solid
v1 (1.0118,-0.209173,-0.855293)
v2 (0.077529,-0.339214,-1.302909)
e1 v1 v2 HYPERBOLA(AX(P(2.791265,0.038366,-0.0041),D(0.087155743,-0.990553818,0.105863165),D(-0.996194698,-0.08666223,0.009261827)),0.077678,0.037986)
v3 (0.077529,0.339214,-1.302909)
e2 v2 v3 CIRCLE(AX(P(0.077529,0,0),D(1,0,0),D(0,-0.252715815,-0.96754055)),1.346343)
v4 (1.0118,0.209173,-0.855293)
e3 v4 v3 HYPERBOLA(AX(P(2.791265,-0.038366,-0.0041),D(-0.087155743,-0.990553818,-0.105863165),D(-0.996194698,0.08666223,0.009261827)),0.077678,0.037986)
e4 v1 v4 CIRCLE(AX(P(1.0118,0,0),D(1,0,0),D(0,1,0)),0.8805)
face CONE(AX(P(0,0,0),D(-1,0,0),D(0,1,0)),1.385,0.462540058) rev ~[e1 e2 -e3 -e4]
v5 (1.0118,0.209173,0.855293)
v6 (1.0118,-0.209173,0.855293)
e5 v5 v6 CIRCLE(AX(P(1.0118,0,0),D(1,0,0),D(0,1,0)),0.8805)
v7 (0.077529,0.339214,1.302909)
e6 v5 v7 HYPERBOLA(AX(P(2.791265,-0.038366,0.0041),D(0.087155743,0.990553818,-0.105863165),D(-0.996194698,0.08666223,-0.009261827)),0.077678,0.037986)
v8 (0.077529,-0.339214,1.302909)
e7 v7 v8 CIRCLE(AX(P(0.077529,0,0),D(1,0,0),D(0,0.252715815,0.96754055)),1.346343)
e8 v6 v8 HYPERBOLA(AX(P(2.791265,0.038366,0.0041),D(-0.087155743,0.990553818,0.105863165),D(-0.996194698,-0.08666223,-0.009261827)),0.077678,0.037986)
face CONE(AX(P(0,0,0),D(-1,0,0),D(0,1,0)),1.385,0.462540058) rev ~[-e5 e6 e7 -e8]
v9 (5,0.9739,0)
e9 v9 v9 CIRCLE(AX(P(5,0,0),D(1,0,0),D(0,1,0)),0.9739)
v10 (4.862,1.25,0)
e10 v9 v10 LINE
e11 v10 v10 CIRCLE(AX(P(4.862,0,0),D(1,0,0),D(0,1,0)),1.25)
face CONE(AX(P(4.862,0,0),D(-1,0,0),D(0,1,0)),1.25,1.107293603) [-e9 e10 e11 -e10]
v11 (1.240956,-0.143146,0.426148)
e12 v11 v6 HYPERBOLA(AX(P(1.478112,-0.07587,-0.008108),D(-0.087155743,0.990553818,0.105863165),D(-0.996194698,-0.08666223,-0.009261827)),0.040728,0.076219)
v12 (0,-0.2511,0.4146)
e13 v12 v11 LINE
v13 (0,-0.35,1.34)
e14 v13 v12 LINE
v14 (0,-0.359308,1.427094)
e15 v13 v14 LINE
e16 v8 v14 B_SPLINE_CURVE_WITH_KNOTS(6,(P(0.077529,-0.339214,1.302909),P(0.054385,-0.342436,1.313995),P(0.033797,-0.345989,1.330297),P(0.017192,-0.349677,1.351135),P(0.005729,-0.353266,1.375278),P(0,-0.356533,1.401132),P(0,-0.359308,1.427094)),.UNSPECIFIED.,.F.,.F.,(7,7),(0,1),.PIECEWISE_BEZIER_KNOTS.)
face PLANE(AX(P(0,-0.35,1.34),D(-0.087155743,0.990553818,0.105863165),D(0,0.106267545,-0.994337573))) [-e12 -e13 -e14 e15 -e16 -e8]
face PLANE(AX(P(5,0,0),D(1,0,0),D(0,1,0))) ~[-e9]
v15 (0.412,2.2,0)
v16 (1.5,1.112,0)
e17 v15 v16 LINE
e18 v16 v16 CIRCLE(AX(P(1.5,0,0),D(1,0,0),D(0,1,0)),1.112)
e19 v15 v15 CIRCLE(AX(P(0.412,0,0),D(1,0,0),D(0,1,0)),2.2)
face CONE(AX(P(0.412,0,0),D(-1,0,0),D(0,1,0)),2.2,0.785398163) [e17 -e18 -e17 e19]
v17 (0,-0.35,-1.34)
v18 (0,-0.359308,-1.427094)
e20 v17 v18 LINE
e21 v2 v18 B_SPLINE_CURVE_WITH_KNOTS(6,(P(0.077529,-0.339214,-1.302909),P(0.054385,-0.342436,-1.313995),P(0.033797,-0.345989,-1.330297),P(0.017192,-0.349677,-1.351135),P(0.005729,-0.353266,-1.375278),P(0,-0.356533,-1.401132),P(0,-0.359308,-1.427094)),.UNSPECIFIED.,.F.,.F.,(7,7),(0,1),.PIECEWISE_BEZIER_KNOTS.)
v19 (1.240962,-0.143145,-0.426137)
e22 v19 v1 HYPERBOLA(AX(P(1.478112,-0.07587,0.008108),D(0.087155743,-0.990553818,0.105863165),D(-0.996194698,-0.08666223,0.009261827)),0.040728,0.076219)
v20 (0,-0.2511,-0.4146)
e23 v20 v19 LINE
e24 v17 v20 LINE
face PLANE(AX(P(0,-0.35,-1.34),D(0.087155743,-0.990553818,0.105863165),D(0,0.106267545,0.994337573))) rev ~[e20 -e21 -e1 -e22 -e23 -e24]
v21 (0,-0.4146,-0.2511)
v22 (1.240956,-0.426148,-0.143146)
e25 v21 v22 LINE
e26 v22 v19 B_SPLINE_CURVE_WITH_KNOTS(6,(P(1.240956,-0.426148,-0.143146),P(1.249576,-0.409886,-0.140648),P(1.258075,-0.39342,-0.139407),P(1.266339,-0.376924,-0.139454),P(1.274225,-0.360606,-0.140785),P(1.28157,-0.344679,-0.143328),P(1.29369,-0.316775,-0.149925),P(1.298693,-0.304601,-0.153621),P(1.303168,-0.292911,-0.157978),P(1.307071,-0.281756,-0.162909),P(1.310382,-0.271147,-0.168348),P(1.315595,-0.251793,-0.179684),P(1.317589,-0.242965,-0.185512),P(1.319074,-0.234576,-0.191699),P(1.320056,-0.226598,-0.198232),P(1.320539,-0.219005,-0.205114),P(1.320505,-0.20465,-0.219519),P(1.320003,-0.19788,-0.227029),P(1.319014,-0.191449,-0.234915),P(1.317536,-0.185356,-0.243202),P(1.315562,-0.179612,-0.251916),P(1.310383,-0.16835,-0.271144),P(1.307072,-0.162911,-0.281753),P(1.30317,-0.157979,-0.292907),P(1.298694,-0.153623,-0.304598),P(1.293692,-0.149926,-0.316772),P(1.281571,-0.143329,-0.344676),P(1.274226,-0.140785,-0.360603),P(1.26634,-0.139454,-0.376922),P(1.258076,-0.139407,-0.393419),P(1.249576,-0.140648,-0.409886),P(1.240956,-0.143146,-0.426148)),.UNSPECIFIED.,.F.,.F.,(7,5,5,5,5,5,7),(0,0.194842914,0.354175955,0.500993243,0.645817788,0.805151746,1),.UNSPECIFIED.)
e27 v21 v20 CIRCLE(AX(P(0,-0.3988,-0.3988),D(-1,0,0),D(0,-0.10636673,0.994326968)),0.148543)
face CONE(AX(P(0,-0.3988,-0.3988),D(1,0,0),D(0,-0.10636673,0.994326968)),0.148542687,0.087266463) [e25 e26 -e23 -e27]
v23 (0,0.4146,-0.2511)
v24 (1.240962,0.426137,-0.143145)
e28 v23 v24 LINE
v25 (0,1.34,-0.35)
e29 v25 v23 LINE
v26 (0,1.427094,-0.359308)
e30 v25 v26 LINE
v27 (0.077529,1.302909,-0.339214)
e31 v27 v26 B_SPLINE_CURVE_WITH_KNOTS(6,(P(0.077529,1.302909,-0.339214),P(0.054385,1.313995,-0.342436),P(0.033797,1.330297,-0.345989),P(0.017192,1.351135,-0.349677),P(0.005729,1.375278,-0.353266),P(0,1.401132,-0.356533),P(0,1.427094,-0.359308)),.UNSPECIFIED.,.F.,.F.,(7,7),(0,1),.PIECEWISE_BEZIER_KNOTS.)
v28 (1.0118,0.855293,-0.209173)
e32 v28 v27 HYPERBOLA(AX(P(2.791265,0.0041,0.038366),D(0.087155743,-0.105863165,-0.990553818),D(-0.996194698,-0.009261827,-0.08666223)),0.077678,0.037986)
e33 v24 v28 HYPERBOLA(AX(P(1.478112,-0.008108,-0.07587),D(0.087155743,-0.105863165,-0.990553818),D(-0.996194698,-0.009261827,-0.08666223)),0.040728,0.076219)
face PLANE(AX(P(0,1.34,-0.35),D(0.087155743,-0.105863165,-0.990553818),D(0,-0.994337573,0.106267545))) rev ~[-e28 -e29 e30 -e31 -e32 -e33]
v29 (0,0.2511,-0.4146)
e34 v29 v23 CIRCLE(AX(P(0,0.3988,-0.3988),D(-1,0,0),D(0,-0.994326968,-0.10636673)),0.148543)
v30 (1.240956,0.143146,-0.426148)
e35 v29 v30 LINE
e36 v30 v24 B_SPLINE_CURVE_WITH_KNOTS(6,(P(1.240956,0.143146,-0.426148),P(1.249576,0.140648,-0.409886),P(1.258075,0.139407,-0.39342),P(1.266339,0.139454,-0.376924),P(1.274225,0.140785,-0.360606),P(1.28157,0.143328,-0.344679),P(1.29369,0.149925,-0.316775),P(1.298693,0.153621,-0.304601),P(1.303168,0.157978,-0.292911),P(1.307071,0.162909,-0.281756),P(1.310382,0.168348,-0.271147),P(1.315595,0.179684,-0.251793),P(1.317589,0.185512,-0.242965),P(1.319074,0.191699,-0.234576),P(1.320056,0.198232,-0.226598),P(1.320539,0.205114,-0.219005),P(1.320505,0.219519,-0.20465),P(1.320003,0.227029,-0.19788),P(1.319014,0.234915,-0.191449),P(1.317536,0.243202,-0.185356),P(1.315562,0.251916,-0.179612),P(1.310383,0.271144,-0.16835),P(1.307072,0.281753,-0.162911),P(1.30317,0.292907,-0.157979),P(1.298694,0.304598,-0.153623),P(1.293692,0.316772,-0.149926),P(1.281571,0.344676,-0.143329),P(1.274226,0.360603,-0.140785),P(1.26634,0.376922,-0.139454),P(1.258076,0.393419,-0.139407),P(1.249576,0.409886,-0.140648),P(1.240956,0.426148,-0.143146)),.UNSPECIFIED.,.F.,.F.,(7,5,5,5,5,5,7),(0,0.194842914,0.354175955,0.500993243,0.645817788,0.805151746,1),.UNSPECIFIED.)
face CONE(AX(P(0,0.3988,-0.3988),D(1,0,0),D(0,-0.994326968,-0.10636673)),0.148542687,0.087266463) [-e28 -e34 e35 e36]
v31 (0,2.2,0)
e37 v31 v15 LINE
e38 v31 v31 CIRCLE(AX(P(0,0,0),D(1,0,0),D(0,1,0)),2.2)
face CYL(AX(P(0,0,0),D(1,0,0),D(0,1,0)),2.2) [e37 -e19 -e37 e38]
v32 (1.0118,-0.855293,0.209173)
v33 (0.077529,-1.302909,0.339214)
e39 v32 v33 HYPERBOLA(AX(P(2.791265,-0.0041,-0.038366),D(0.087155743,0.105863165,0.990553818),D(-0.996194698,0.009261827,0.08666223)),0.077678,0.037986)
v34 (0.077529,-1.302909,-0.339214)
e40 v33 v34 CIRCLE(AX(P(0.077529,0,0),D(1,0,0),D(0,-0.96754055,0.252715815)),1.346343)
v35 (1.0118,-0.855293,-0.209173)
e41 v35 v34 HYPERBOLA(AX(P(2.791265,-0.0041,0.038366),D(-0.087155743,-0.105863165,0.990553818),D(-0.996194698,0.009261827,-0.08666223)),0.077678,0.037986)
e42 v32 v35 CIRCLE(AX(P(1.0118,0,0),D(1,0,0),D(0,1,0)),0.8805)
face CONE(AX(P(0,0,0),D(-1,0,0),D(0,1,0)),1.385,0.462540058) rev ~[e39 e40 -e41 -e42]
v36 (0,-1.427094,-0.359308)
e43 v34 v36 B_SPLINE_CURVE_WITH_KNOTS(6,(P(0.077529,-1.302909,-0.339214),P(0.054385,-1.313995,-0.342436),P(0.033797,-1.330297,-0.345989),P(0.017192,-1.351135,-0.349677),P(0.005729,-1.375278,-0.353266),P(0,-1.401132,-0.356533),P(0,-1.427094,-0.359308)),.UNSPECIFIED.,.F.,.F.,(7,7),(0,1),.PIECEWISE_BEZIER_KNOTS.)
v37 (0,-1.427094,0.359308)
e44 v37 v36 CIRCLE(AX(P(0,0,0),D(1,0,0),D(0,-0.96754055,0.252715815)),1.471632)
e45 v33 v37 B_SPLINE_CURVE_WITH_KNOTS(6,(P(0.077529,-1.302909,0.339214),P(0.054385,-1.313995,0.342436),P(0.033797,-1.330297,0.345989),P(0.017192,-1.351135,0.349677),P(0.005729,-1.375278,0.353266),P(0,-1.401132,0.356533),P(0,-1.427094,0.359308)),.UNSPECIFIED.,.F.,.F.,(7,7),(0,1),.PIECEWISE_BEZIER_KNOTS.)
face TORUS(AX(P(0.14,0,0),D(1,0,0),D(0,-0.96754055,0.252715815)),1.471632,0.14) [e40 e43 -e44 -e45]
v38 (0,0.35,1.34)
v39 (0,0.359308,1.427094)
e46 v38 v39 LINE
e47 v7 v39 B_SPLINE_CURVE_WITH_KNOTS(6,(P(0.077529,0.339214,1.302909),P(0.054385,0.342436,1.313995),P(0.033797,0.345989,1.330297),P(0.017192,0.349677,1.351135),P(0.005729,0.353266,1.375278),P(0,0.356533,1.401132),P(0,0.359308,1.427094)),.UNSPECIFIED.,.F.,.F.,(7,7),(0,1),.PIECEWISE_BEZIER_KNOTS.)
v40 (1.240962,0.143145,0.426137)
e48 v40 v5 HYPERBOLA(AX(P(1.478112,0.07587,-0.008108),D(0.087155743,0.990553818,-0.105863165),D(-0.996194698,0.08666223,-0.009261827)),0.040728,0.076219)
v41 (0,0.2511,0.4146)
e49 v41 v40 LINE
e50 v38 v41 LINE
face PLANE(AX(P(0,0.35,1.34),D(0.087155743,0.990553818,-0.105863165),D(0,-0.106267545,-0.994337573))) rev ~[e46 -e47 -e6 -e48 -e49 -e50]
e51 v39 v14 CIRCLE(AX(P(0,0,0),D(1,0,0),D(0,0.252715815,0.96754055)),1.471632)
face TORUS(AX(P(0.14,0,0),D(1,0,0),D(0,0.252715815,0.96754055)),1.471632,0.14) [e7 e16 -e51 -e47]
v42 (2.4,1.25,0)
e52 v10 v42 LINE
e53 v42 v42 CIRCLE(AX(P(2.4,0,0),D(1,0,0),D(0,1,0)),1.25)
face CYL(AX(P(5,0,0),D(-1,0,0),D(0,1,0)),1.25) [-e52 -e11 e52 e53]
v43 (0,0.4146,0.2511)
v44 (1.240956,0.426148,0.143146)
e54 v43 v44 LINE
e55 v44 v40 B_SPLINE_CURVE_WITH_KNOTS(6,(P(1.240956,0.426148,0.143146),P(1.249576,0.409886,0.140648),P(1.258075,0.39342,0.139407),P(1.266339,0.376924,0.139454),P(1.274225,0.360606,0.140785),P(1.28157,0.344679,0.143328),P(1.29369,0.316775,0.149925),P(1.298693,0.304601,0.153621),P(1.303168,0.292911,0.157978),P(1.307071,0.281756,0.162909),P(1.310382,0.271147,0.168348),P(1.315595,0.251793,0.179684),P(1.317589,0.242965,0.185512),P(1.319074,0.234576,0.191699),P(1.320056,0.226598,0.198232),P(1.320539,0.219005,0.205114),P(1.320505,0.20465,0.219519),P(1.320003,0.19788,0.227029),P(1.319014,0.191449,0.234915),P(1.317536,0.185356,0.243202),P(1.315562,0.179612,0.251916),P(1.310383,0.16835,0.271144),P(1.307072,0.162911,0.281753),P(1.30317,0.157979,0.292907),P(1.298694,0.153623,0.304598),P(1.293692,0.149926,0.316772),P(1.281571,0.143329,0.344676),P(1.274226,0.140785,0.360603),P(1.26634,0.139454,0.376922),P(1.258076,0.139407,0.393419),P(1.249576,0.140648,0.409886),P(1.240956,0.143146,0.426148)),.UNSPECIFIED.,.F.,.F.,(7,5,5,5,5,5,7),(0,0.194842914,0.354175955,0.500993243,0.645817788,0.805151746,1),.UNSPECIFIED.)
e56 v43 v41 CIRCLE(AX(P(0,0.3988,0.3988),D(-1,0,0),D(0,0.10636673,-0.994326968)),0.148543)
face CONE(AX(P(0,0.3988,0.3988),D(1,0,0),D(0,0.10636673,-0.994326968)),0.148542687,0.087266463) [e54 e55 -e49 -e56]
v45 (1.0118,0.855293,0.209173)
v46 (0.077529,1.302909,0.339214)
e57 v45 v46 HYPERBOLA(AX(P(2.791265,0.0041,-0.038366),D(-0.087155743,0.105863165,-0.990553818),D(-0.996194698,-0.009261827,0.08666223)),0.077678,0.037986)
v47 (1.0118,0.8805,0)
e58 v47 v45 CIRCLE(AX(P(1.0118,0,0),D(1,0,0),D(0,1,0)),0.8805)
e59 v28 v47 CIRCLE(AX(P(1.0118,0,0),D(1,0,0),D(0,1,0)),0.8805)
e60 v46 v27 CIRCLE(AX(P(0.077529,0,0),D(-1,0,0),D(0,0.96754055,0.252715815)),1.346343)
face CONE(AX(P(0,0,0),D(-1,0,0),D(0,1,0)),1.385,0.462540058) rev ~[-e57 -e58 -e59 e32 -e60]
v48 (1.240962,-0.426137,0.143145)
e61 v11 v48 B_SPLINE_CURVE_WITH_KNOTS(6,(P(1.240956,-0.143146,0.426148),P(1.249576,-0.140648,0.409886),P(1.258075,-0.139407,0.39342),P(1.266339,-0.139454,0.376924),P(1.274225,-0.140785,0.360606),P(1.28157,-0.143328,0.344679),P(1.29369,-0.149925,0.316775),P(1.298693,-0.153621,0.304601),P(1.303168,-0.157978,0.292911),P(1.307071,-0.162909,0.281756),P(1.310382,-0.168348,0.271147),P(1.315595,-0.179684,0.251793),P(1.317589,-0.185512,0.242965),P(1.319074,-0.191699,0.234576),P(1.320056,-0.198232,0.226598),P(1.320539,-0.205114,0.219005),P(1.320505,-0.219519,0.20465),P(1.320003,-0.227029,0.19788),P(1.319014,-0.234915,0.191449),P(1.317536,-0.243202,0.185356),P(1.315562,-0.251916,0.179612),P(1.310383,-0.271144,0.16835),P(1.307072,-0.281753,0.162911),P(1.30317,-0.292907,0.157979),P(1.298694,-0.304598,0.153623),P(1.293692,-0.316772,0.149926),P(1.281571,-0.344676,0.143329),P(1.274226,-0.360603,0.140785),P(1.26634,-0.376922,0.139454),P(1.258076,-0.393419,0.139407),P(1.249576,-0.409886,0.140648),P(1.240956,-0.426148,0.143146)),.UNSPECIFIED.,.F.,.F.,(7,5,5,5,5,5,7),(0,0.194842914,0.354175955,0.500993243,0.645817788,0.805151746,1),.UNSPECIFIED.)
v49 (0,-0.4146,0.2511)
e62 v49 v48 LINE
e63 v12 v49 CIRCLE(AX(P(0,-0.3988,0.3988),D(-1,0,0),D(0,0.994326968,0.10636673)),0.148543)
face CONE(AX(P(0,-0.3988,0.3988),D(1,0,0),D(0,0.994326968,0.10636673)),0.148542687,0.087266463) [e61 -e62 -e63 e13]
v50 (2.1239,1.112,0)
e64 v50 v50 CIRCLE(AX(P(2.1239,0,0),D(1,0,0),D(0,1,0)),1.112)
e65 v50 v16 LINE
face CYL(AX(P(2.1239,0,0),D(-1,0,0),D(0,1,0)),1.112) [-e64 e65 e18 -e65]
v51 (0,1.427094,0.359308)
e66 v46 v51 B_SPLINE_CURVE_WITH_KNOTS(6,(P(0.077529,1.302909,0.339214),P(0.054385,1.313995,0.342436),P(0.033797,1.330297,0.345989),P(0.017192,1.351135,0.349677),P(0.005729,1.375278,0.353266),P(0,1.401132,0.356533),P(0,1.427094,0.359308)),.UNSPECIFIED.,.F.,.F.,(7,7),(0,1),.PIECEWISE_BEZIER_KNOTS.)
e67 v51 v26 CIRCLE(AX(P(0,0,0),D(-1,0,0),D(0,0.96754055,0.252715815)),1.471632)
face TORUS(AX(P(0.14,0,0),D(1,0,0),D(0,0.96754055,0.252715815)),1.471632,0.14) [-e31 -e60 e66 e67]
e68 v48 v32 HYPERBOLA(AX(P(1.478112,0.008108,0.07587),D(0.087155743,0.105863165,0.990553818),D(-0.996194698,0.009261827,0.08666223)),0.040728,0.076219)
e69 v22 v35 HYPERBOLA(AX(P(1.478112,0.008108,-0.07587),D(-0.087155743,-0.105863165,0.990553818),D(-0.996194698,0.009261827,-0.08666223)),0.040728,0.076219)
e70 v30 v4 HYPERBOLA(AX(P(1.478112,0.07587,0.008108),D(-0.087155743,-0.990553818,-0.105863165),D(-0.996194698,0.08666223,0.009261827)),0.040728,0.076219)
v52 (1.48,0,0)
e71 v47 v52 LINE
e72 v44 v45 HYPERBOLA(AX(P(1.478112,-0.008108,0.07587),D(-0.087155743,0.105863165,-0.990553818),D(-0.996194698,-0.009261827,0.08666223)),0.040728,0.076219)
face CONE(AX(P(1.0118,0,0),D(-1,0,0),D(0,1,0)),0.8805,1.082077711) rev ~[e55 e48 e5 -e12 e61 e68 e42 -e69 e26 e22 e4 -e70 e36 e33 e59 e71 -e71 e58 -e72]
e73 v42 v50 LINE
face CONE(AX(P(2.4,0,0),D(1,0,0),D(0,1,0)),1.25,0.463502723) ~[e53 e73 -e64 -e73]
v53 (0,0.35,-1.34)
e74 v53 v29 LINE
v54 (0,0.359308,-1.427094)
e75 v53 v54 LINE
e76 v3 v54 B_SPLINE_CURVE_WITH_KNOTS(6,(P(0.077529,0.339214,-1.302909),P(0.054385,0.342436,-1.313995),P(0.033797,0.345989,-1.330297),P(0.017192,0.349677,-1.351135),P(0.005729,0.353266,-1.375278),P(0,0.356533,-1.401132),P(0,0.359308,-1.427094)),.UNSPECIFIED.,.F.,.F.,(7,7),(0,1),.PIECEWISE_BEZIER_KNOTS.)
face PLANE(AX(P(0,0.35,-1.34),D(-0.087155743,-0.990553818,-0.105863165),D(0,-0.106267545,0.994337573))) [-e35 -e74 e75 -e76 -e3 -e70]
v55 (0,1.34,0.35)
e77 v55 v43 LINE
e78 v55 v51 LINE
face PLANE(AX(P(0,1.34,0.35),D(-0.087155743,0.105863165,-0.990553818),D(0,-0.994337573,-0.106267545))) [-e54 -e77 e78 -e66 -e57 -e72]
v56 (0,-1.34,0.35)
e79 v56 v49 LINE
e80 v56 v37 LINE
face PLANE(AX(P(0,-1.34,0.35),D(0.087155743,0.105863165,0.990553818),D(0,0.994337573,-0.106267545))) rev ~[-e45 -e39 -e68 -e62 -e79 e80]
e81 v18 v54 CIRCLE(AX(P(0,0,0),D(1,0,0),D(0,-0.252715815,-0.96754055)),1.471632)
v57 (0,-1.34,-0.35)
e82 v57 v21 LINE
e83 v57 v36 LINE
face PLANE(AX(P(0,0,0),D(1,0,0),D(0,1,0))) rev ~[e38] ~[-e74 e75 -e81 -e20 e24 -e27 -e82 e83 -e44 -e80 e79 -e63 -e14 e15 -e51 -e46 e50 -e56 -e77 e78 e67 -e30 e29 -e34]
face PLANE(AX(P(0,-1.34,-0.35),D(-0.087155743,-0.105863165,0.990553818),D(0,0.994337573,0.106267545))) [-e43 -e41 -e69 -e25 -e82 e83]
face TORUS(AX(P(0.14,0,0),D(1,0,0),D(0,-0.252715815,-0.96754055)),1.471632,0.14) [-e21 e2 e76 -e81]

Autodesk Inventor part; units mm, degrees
ref_plane "YZ Plane" through (0, 0, 0) normal (1, 0, 0) x (0, 1, 0)
ref_plane "XZ Plane" through (0, 0, 0) normal (0, 1, 0) x (-1, 0, 0)
sketch "Szkic1" plane through (0, 0, 0) normal (0, 0, 1) x (1, 0, 0)
  line L0 (1.48, 0) -> (5, 0)
  line L1 (5, 0) -> (5, 1.25)
  line L2 (5, 1.25) -> (2.4, 1.25)
  line L3 (2.4, 1.25) -> (2.1239, 1.112)
  line L4 (2.1239, 1.112) -> (1.5, 1.112)
  line L5 (0, 2.2) -> (0, 1.385)
  line L6 (0, 1.385) -> (1.0118, 0.8805)
  line L7 (1.0118, 0.8805) -> (1.48, 0)
  line L8 (-1, 0) -> (6, 0) projected
  line L9 (0, -0.44) -> (0, 2.64) projected
  line L10 (0, 2.2) -> (0.412, 2.2)
  line L11 (0.412, 2.2) -> (1.5, 1.112)
  line L12 (2.4, 1.25) -> (1.362, 1.25) construction
  dimension "d1" = 2.6
  dimension "d2" = 2.5
  dimension "d3" = 2.2239
  dimension "d4" = 2.77
  dimension "d5" = 26.5
  dimension "d6" = 62
  dimension "d7" = 1.48
  dimension "d8" = 0.2761
  dimension "d12" = 4.4
  dimension "d13" = 45
  dimension "d15" = 5
  dimension "d24" = 1.5
revolve "Bryła" add sketch "Szkic1" angle 360 about axis through (1.48, 0, 0) along (1, 0, 0) contours L7 L6 L5 L10 L11 L4 L3 L2 L1 L0
sketch "Szkic2" plane through (0, 0, 0) normal (-1, 0, 0) x (0, 0, 1)
  line L0 (0, 1.385) -> (0, 0) construction
  line L1 (0, 0) -> (1.385, 0) construction
  arc A0 (0.4155, 0) -> (0, 0.4155) centre (0, 0) ccw construction
  arc A1 (0.4848, 0) -> (0, 0.4848) centre (0, 0) ccw construction
  arc A2 (1.34, 0.35) -> (0.35, 1.34) centre (0, 0) ccw
  line L2 (0, 0) -> (0.9793, 0.9793) construction
  line L3 (0.35, 1.34) -> (0.2511, 0.4146)
  line L4 (1.34, 0.35) -> (0.4146, 0.2511)
  arc A3 (0.35, 1.34) -> (0, 1.385) centre (0, 0) ccw
  arc A4 (1.385, 0) -> (1.34, 0.35) centre (0, 0) ccw
  line L5 (0, -3.08) -> (0, 3.08) projected
  line L6 (-3.08, 0) -> (3.08, 0) projected
  arc A5 (0.35, -1.34) -> (1.34, -0.35) centre (0, 0) ccw
  line L7 (0.35, -1.34) -> (0.2511, -0.4146)
  line L8 (1.34, -0.35) -> (0.4146, -0.2511)
  arc A6 (0, -1.385) -> (0.35, -1.34) centre (0, 0) ccw
  arc A7 (1.34, -0.35) -> (1.385, 0) centre (0, 0) ccw
  arc A8 (-0.35, 1.34) -> (-1.34, 0.35) centre (0, 0) ccw
  line L9 (-0.35, 1.34) -> (-0.2511, 0.4146)
  line L10 (-1.34, 0.35) -> (-0.4146, 0.2511)
  arc A9 (0, 1.385) -> (-0.35, 1.34) centre (0, 0) ccw
  arc A10 (-1.34, 0.35) -> (-1.385, 0) centre (0, 0) ccw
  arc A11 (-0.35, -1.34) -> (0, -1.385) centre (0, 0) ccw
  arc A12 (-1.34, -0.35) -> (-0.35, -1.34) centre (0, 0) ccw
  arc A13 (-1.385, 0) -> (-1.34, -0.35) centre (0, 0) ccw
  line L11 (-1.34, -0.35) -> (-0.4146, -0.2511)
  line L12 (-0.35, -1.34) -> (-0.2511, -0.4146)
  arc A14 (0.2511, 0.4146) -> (0.4146, 0.2511) centre (0.3988, 0.3988) ccw
  arc A15 (0.4146, -0.2511) -> (0.2511, -0.4146) centre (0.3988, -0.3988) ccw
  arc A16 (-0.4146, 0.2511) -> (-0.2511, 0.4146) centre (-0.3988, 0.3988) ccw
  arc A17 (-0.2511, -0.4146) -> (-0.4146, -0.2511) centre (-0.3988, -0.3988) ccw
  point P0 (0.9793, -0.9793)
  point P1 (-0.9793, 0.9793)
  point P2 (-0.9793, -0.9793)
  dimension "d17" = 0.831
  dimension "d18" = 0.9695
  dimension "d19" = 2.77
  dimension "d20" = 45
  dimension "d21" = 0.35
extrude "Szczelina" add sketch "Szkic2" against normal up to next draft 5 contours L4 A14 L3 A2 | A5 L7 A15 L8 | L9 A16 L10 A8 | A12 L11 A17 L12
fillet "Zaokrąglenie1" radius 0.14 4 edges at (0, 1.385, 0) (0, 0, -1.385) (0, -1.385, 0) (0, 0, 1.385)
thread "Gwint" size "M2.5x0.45" class "6g" standard "ISO Metric profile" length 2.6
chamfer "Faza1" distance 0.2761 distance2 0.138 1 edges at (5, -1.25, 0) measured on face at (5, 0.5901, -0.3896)
ref_plane "Work Plane2" through (3.35, 0, 0) normal (0, 0, -1) x (1, 0, 0)
equation "\"d1\" = GEL"
equation "\"d2\" = GD"
equation "\"d3\" = BDM"
equation "\"d4\" = SDM"
equation "\"d7\" = INTI"
equation "\"d8\" = GAL"
equation "\"d12\" = KOD"
equation "\"d13\" = 0.5 * SEWI"
equation "\"d15\" = NLG"
equation "\"d24\" = KOH"
equation "\"d17\" = 0.3 * SDM"
equation "\"d18\" = 0.35 * SDM"
equation "\"d19\" = SDM"
equation "\"d21\" = 0.5 * SBR"
equation "\"d23\" = 0.2 * SBR"
equation "\"d10\" = GEL"
equation "\"d25\" = -0.5 * SPD + 0.5 * GD"
equation "\"d26\" = 0.5 * GAL"
equation "\"NLG\" = 5"
equation "\"GEL\" = 2.6"
equation "\"GAL\" = 0.61345 * PTC"
equation "\"SPD\" = NND - 1.2269 * PTC"
equation "\"KOD\" = 4.4"
equation "\"KOH\" = 1.5"
equation "\"SBR\" = 0.7"
equation "\"INTI\" = 1.48"
equation "\"SDM\" = 2.77"
equation "\"GD\" = NND"
equation "\"BDM\" = NND - GAL"
equation "\"SEWI\" = 90deg"
equation "\"d9\" = SDM"
equation "\"GUL\" = 0.61345 * PTC"
equation "\"TOA\" = 30deg"
equation "\"EPV\" = 2.75"
equation "\"THREADDIA\" = 2.5"
equation "\"RR\" = 0.3"
equation "\"PTC\" = 0.45"
equation "\"NND\" = 2.5"
equation "\"GD1\" = THREADDIA - 1.2269 * PTC"
properties part number "AS 1427 - M2,5 x 5" material "Stal, miękka"
